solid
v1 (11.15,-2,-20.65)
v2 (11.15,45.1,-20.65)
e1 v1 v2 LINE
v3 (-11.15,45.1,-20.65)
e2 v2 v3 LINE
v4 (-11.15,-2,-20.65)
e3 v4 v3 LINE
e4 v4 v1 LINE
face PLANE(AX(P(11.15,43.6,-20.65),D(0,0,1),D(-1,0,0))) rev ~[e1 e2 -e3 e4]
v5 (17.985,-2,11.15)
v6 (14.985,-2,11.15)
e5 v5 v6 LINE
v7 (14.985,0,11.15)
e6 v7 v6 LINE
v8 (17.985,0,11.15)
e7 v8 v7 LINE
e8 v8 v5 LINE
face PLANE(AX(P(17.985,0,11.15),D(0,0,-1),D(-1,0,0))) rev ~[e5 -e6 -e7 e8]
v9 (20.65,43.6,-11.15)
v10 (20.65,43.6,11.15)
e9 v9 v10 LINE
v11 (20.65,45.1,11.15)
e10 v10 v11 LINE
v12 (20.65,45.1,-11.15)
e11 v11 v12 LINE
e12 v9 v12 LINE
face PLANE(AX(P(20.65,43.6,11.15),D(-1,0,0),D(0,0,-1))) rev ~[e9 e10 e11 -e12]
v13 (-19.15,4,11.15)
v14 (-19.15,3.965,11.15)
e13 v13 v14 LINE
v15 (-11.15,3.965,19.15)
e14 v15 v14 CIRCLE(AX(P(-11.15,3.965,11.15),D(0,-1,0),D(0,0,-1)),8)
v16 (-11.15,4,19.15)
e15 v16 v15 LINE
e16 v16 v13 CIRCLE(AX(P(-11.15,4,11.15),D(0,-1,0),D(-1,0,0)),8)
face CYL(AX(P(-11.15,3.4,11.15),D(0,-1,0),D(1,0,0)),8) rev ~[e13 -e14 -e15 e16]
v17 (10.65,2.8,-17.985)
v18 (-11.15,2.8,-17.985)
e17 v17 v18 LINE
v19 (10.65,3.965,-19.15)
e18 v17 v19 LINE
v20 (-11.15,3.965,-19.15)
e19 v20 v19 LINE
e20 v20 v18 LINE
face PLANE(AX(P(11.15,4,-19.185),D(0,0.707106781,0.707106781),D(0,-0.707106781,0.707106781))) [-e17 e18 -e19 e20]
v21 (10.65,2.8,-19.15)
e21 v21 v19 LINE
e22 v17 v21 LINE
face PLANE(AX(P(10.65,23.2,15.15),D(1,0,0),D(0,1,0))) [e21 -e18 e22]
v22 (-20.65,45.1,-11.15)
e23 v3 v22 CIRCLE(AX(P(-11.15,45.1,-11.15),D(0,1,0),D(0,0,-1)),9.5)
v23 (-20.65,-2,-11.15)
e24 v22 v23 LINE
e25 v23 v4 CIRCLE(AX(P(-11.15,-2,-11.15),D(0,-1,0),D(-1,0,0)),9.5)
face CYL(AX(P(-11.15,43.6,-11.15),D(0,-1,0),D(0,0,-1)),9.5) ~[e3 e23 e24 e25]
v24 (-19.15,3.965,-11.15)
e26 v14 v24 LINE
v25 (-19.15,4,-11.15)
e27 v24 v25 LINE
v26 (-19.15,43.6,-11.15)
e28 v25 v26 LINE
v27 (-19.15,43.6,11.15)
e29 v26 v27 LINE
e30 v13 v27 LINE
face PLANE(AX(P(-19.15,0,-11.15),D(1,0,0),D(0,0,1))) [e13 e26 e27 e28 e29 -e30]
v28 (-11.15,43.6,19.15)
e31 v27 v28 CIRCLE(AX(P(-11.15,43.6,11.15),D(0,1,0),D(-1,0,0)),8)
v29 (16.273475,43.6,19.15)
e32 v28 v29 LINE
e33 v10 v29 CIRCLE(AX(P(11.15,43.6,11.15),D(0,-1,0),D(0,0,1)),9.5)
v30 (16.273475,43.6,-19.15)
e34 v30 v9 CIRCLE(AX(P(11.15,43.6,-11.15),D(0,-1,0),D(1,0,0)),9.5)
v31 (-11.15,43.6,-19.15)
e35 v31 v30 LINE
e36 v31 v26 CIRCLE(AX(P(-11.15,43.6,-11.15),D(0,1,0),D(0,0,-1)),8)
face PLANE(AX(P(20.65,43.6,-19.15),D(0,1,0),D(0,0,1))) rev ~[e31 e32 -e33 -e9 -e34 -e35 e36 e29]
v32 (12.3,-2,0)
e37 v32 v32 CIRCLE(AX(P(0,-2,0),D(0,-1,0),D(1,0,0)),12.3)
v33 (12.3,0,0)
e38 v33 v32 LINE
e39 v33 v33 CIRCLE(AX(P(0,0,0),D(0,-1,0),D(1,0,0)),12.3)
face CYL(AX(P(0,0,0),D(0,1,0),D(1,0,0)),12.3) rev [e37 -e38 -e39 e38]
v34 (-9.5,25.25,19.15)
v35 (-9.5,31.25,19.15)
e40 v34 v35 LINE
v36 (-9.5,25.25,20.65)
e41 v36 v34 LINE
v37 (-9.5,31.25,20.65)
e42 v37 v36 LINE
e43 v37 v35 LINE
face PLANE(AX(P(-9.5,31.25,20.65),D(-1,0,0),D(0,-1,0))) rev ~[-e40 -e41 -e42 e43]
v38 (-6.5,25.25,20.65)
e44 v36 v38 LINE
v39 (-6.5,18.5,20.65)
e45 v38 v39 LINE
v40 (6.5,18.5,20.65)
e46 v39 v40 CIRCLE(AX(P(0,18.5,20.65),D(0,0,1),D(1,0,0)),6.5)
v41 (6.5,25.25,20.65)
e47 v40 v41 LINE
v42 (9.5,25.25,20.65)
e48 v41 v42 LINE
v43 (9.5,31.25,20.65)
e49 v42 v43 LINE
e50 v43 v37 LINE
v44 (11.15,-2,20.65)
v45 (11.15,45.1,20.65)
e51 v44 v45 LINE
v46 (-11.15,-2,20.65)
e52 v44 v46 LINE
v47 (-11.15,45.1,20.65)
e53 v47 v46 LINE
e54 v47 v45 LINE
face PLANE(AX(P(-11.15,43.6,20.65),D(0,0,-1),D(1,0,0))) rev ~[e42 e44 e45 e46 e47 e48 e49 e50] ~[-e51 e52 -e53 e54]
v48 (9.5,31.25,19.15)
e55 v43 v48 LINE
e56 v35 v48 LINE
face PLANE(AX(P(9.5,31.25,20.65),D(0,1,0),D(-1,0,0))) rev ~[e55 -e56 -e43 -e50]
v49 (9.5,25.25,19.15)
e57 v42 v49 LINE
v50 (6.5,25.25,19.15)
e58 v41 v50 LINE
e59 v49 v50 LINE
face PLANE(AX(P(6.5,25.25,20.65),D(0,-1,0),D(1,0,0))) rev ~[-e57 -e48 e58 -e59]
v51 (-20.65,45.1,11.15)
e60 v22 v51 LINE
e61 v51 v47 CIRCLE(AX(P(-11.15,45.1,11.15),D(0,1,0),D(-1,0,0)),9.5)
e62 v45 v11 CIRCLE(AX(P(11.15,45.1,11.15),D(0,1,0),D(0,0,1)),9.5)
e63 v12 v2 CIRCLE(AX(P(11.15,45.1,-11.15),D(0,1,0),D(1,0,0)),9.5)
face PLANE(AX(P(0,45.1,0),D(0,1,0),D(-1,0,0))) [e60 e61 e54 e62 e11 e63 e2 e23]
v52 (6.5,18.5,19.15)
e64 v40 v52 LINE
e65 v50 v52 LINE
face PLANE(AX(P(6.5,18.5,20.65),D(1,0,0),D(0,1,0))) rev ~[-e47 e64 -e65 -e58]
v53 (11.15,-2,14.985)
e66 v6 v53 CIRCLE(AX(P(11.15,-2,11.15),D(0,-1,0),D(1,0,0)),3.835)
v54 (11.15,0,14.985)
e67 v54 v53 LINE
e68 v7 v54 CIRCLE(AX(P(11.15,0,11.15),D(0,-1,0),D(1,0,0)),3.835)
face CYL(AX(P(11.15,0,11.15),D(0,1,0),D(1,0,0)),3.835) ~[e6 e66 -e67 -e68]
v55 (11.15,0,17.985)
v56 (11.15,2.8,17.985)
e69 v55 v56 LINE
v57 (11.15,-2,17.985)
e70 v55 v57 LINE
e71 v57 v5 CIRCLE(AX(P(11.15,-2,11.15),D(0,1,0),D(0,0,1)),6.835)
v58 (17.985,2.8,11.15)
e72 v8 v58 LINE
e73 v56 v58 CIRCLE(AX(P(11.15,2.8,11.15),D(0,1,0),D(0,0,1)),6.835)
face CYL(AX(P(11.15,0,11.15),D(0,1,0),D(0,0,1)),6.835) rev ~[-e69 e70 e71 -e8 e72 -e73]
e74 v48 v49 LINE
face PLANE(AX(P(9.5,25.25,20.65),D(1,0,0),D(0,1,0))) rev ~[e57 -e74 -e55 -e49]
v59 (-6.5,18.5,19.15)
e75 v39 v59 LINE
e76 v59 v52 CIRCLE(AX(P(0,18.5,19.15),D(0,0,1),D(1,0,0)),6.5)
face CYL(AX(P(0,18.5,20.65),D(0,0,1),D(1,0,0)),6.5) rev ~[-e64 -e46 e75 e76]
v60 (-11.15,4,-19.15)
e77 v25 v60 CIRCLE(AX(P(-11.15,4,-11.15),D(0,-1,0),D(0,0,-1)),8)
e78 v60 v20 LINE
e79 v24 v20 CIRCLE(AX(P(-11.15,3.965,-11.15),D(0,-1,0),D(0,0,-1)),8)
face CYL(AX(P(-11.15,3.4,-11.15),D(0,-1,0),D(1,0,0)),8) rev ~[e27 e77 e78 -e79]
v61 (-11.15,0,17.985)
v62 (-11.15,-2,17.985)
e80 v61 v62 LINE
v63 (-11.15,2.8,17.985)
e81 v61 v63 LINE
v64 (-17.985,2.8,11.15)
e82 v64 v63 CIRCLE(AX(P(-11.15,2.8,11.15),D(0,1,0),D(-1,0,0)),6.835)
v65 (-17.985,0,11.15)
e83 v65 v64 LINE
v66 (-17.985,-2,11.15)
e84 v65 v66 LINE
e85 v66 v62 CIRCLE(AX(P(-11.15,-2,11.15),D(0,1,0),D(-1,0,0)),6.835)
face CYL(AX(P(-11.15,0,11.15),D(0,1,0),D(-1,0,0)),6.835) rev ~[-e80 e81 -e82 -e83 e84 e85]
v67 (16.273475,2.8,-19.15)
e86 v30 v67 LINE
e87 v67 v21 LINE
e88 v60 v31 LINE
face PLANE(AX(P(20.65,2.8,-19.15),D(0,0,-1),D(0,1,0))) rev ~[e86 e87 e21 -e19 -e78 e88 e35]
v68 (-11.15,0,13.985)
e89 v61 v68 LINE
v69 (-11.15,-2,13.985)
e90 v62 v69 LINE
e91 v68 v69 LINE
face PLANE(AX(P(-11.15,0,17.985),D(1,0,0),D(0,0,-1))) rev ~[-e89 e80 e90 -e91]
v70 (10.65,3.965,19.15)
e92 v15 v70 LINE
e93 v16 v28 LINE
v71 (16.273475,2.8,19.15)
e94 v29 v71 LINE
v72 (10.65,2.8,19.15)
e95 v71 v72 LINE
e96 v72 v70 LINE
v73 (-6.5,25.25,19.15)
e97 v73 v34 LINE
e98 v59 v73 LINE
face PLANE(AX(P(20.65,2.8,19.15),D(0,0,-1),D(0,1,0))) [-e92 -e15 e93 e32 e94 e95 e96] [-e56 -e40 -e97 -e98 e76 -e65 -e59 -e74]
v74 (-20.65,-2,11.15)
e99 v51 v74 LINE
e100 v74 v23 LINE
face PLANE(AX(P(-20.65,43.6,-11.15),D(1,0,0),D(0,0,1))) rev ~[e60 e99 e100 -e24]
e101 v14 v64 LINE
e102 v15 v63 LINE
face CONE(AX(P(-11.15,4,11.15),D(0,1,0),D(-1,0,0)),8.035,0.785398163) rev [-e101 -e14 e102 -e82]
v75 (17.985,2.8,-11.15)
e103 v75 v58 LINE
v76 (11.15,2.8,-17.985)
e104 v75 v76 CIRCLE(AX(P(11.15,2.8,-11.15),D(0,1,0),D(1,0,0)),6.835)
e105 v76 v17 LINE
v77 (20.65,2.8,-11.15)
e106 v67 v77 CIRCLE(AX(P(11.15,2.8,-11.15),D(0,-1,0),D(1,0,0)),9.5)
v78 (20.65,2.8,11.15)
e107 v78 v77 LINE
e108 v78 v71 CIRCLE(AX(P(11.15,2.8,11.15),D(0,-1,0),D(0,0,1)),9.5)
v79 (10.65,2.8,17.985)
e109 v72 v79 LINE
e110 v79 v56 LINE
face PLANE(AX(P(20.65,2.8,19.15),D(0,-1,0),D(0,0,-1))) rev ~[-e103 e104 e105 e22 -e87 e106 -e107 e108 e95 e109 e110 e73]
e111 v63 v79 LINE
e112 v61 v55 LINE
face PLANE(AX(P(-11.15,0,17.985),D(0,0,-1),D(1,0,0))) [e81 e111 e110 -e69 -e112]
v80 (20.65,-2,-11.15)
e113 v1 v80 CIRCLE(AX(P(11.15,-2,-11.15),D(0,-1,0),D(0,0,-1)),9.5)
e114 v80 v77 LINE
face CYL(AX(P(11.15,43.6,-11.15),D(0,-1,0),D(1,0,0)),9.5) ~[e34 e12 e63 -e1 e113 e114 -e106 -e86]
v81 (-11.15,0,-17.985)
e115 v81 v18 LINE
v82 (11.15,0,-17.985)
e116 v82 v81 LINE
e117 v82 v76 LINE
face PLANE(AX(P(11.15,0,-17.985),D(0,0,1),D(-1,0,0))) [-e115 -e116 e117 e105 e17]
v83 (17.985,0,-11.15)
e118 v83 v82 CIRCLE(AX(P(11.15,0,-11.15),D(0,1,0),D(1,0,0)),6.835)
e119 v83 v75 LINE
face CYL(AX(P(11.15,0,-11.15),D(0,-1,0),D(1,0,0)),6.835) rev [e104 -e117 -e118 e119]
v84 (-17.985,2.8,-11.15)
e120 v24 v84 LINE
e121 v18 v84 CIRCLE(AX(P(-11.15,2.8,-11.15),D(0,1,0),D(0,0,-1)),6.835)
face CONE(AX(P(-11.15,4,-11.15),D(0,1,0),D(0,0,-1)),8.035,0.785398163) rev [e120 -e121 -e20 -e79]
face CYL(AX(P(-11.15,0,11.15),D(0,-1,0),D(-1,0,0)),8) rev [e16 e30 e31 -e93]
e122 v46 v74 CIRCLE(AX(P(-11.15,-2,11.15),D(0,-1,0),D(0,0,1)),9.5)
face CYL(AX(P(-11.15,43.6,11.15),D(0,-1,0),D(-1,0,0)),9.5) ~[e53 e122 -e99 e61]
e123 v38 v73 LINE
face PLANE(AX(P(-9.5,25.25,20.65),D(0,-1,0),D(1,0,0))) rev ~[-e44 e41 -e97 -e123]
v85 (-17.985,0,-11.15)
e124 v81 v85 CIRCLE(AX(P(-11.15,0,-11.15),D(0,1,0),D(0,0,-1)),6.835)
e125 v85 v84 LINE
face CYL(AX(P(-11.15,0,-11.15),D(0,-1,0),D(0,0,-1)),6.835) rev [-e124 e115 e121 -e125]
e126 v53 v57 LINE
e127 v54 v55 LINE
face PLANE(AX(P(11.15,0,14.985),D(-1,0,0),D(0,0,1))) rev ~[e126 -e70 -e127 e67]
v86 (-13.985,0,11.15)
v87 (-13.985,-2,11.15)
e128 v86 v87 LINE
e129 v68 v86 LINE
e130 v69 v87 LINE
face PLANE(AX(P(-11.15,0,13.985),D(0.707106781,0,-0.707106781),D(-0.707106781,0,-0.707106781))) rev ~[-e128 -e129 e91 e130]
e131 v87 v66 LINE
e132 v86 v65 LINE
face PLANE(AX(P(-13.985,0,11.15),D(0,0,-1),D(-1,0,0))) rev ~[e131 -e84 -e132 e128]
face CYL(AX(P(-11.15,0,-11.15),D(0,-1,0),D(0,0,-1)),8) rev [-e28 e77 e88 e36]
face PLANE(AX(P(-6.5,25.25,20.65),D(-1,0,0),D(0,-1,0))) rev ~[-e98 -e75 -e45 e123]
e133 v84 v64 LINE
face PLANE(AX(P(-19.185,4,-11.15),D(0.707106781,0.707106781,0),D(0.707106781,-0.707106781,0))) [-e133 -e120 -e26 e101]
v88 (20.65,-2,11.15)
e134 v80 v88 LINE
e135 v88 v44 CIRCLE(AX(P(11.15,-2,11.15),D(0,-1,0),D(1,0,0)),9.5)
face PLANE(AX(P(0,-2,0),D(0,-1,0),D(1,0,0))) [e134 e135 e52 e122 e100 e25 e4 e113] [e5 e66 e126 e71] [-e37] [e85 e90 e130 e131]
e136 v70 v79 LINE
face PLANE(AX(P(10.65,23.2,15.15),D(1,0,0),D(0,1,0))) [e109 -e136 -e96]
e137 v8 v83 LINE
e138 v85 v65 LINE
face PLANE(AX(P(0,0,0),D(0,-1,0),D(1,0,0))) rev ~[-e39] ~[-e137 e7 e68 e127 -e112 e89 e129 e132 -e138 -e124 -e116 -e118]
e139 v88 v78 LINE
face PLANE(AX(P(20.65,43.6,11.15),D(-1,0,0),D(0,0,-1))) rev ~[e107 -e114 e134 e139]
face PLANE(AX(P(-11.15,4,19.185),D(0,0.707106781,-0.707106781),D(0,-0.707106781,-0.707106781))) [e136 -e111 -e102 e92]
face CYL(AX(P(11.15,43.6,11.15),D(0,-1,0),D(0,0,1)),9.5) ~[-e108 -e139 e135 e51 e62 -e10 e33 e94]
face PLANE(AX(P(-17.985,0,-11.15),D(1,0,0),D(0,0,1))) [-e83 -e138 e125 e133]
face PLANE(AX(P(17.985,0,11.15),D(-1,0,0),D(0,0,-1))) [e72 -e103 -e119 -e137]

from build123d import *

# Parameters (mm, degrees)
F1_DEPTH     = 43.6
F2_DEPTH     = 4
F3_T1_DEPTH  = 22.3
F3_T6_ANGLE  = 90
F3_S7_R      = 8
F3_T8_DEPTH  = 7
F3_T12_DEPTH = 22.3
F3_T17_ANGLE = 90
F3_S18_R     = 8
F3_T19_DEPTH = 7
F3_T23_DEPTH = 22.3
F3_T28_ANGLE = 90
F3_T33_ANGLE = 90
F3_T38_DEPTH = 22.3
F5_DEPTH     = 5
F6_R         = 12.3
F7_DEPTH     = 2
F9_DEPTH     = 1.5
F10_W        = 40.8
F10_H        = 8
F10_H_2      = 22.3
F11_DEPTH    = 10


# Not quite as in the source:
# - a fillet or chamfer that OpenCascade refuses, or shapes differently, is made with other operations: its cross-section is extruded or revolved along the edge and cut away or added


with BuildPart() as f1:
    # F0 (on Front) → F1 (new body)
    with BuildSketch(Plane.XZ):
        with BuildLine():
            ThreePointArc((20.65, 11.15), (17.8675144213, 17.8675144213), (11.15, 20.65))
            Line((11.15, 20.65), (-11.15, 20.65))
            ThreePointArc((-11.15, 20.65), (-17.8675144213, 17.8675144213), (-20.65, 11.15))
            Line((-20.65, 11.15), (-20.65, -11.15))
            ThreePointArc((-20.65, -11.15), (-17.8675144213, -17.8675144213), (-11.15, -20.65))
            Line((-11.15, -20.65), (11.15, -20.65))
            ThreePointArc((11.15, -20.65), (17.8675144213, -17.8675144213), (20.65, -11.15))
            Line((20.65, -11.15), (20.65, 11.15))
        make_face()
        with BuildLine():
            Line((-11.15, 19.15), (11.15, 19.15))
            ThreePointArc((11.15, 19.15), (16.8068542495, 16.8068542495), (19.15, 11.15))
            Line((19.15, 11.15), (19.15, -11.15))
            ThreePointArc((19.15, -11.15), (16.8068542495, -16.8068542495), (11.15, -19.15))
            Line((11.15, -19.15), (-11.15, -19.15))
            ThreePointArc((-11.15, -19.15), (-16.8068542495, -16.8068542495), (-19.15, -11.15))
            Line((-19.15, -11.15), (-19.15, 11.15))
            ThreePointArc((-19.15, 11.15), (-16.8068542495, 16.8068542495), (-11.15, 19.15))
        make_face(mode=Mode.SUBTRACT)
    extrude(amount=-F1_DEPTH)

    # F0 (on Front) → F2 (join)
    with BuildSketch(Plane.XZ):
        with BuildLine():
            ThreePointArc((20.65, 11.15), (17.8675144213, 17.8675144213), (11.15, 20.65))
            Line((11.15, 20.65), (-11.15, 20.65))
            ThreePointArc((-11.15, 20.65), (-17.8675144213, 17.8675144213), (-20.65, 11.15))
            Line((-20.65, 11.15), (-20.65, -11.15))
            ThreePointArc((-20.65, -11.15), (-17.8675144213, -17.8675144213), (-11.15, -20.65))
            Line((-11.15, -20.65), (11.15, -20.65))
            ThreePointArc((11.15, -20.65), (17.8675144213, -17.8675144213), (20.65, -11.15))
            Line((20.65, -11.15), (20.65, 11.15))
        make_face()
        with BuildLine():
            Line((-11.15, 19.15), (11.15, 19.15))
            ThreePointArc((11.15, 19.15), (16.8068542495, 16.8068542495), (19.15, 11.15))
            Line((19.15, 11.15), (19.15, -11.15))
            ThreePointArc((19.15, -11.15), (16.8068542495, -16.8068542495), (11.15, -19.15))
            Line((11.15, -19.15), (-11.15, -19.15))
            ThreePointArc((-11.15, -19.15), (-16.8068542495, -16.8068542495), (-19.15, -11.15))
            Line((-19.15, -11.15), (-19.15, 11.15))
            ThreePointArc((-19.15, 11.15), (-16.8068542495, 16.8068542495), (-11.15, 19.15))
        make_face(mode=Mode.SUBTRACT)
        with BuildLine():
            ThreePointArc((19.15, 11.15), (16.8068542495, 16.8068542495), (11.15, 19.15))
            Line((11.15, 19.15), (-11.15, 19.15))
            ThreePointArc((-11.15, 19.15), (-16.8068542495, 16.8068542495), (-19.15, 11.15))
            Line((-19.15, 11.15), (-19.15, -11.15))
            ThreePointArc((-19.15, -11.15), (-16.8068542495, -16.8068542495), (-11.15, -19.15))
            Line((-11.15, -19.15), (11.15, -19.15))
            ThreePointArc((11.15, -19.15), (16.8068542495, -16.8068542495), (19.15, -11.15))
            Line((19.15, -11.15), (19.15, 11.15))
        make_face()
        with BuildLine():
            Line((-11.15, 17.985), (11.15, 17.985))
            ThreePointArc((11.15, 17.985), (15.9830748494, 15.9830748494), (17.985, 11.15))
            Line((17.985, 11.15), (17.985, -11.15))
            ThreePointArc((17.985, -11.15), (15.9830748494, -15.9830748494), (11.15, -17.985))
            Line((11.15, -17.985), (-11.15, -17.985))
            ThreePointArc((-11.15, -17.985), (-15.9830748494, -15.9830748494), (-17.985, -11.15))
            Line((-17.985, -11.15), (-17.985, 11.15))
            ThreePointArc((-17.985, 11.15), (-15.9830748494, 15.9830748494), (-11.15, 17.985))
        make_face(mode=Mode.SUBTRACT)
    extrude(amount=-F2_DEPTH)

    # F3: chamfer of 1.2 on 8 edges, made by hand

    # F3_s2 → F3_t1 (cut)
    with BuildSketch(Plane.XY.offset(-11.15)):
        Polygon((19.185, 4), (17.985, 2.8), (17.985, 4), align=None)
    extrude(amount=F3_T1_DEPTH, mode=Mode.SUBTRACT)


with BuildPart() as f3_tool4:
    # F3_s5 → F3_t6 (revolve)
    with BuildSketch(Plane.XY.offset(11.15)):
        Polygon((-19.185, 4), (-17.985, 2.8), (-17.985, 4), align=None)
    revolve(axis=Axis((-11.15, 4, 11.15), (0, 1, 0)), revolution_arc=F3_T6_ANGLE)

    # F3_s7 → F3_t8 (intersect, symmetric)
    with BuildSketch(Plane.XZ.offset(-3.4)):
        with Locations((-11.15, 11.15)):
            Circle(F3_S7_R)
    extrude(amount=F3_T8_DEPTH, both=True, mode=Mode.INTERSECT)


with BuildPart() as f1_1:
    add(f1.part)

    # F3_t3: cut F3_tool4
    add(f3_tool4.part, mode=Mode.SUBTRACT)


with BuildPart() as f3_tool10:
    # F3_s11 → F3_t12 (new body)
    with BuildSketch(Plane.XY.offset(-11.15)):
        Polygon((-19.185, 4), (-17.985, 2.8), (-17.985, 4), align=None)
    extrude(amount=F3_T12_DEPTH)

    split(bisect_by=Plane.YZ.offset(-19.15), keep=Keep.TOP)


with BuildPart() as f1_2:
    add(f1_1.part)

    # F3_t9: cut F3_tool10
    add(f3_tool10.part, mode=Mode.SUBTRACT)


with BuildPart() as f3_tool15:
    # F3_s16 → F3_t17 (revolve)
    with BuildSketch(Plane.YZ.offset(-11.15)):
        Polygon((4, -19.185), (2.8, -17.985), (4, -17.985), align=None)
    revolve(axis=Axis((-11.15, 4, -11.15), (0, 1, 0)), revolution_arc=F3_T17_ANGLE)

    # F3_s18 → F3_t19 (intersect, symmetric)
    with BuildSketch(Plane.XZ.offset(-3.4)):
        with Locations((-11.15, -11.15)):
            Circle(F3_S18_R)
    extrude(amount=F3_T19_DEPTH, both=True, mode=Mode.INTERSECT)


with BuildPart() as f1_3:
    add(f1_2.part)

    # F3_t14: cut F3_tool15
    add(f3_tool15.part, mode=Mode.SUBTRACT)


with BuildPart() as f3_tool21:
    # F3_s22 → F3_t23 (new body)
    with BuildSketch(Plane.YZ.offset(11.15)):
        Polygon((4, -19.185), (2.8, -17.985), (4, -17.985), align=None)
    extrude(amount=-F3_T23_DEPTH)

    split(bisect_by=Plane.XY.offset(-19.15), keep=Keep.TOP)


with BuildPart() as f1_4:
    add(f1_3.part)

    # F3_t20: cut F3_tool21
    add(f3_tool21.part, mode=Mode.SUBTRACT)


with BuildPart() as f3_tool26:
    # F3_s27 → F3_t28 (revolve)
    with BuildSketch(Plane.XY.offset(-11.15)):
        Polygon((19.185, 4), (17.985, 2.8), (17.985, 4), align=None)
    revolve(axis=Axis((11.15, 4, -11.15), (0, 1, 0)), revolution_arc=F3_T28_ANGLE)

    split(bisect_by=Plane.XY.offset(-19.15), keep=Keep.TOP)


with BuildPart() as f1_5:
    add(f1_4.part)

    # F3_t25: cut F3_tool26
    add(f3_tool26.part, mode=Mode.SUBTRACT)


with BuildPart() as f3_tool31:
    # F3_s32 → F3_t33 (revolve)
    with BuildSketch(Plane.YZ.offset(11.15)):
        Polygon((4, 19.185), (2.8, 17.985), (4, 17.985), align=None)
    revolve(axis=Axis((11.15, 4, 11.15), (0, 1, 0)), revolution_arc=F3_T33_ANGLE)

    split(bisect_by=Plane.XY.offset(19.15), keep=Keep.BOTTOM)


with BuildPart() as f1_6:
    add(f1_5.part)

    # F3_t30: cut F3_tool31
    add(f3_tool31.part, mode=Mode.SUBTRACT)


with BuildPart() as f3_tool36:
    # F3_s37 → F3_t38 (new body)
    with BuildSketch(Plane.YZ.offset(-11.15)):
        Polygon((4, 19.185), (2.8, 17.985), (4, 17.985), align=None)
    extrude(amount=F3_T38_DEPTH)

    split(bisect_by=Plane.XY.offset(19.15), keep=Keep.BOTTOM)


with BuildPart() as f1_7:
    add(f1_6.part)

    # F3_t35: cut F3_tool36
    add(f3_tool36.part, mode=Mode.SUBTRACT)

    # F4 (on face) → F5 (cut)
    with BuildSketch(Plane.XY.offset(20.65)):
        Polygon((-6.5, 25.25), (6.5, 25.25), (9.5, 25.25), (9.5, 31.25), (-9.5, 31.25), (-9.5, 25.25), align=None)
        with BuildLine():
            ThreePointArc((-6.5, 18.5), (0, 12), (6.5, 18.5))
            ThreePointArc((6.5, 18.5), (0, 25), (-6.5, 18.5))
        make_face()
        with BuildLine():
            ThreePointArc((-6.5, 18.5), (0, 25), (6.5, 18.5))
            Line((6.5, 18.5), (6.5, 25.25))
            Line((6.5, 25.25), (-6.5, 25.25))
            Line((-6.5, 25.25), (-6.5, 18.5))
        make_face()
    extrude(amount=-F5_DEPTH, mode=Mode.SUBTRACT)

    # F6 (on face) → F7 (join)
    with BuildSketch(Plane.XZ):
        with BuildLine():
            Line((20.65, -11.15), (20.65, 11.15))
            ThreePointArc((20.65, 11.15), (17.8675144213, 17.8675144213), (11.15, 20.65))
            Line((11.15, 20.65), (-11.15, 20.65))
            ThreePointArc((-11.15, 20.65), (-17.8675144213, 17.8675144213), (-20.65, 11.15))
            Line((-20.65, 11.15), (-20.65, -11.15))
            ThreePointArc((-20.65, -11.15), (-17.8675144213, -17.8675144213), (-11.15, -20.65))
            Line((-11.15, -20.65), (11.15, -20.65))
            ThreePointArc((11.15, -20.65), (17.8675144213, -17.8675144213), (20.65, -11.15))
        make_face()
        with BuildLine():
            ThreePointArc((11.15, 17.985), (15.9830748494, 15.9830748494), (17.985, 11.15))
            Line((17.985, 11.15), (17.985, -11.15))
            ThreePointArc((17.985, -11.15), (15.9830748494, -15.9830748494), (11.15, -17.985))
            Line((11.15, -17.985), (-11.15, -17.985))
            ThreePointArc((-11.15, -17.985), (-15.9830748494, -15.9830748494), (-17.985, -11.15))
            Line((-17.985, -11.15), (-17.985, 11.15))
            ThreePointArc((-17.985, 11.15), (-15.9830748494, 15.9830748494), (-11.15, 17.985))
            Line((-11.15, 17.985), (11.15, 17.985))
        make_face(mode=Mode.SUBTRACT)
        with BuildLine():
            Line((17.985, 11.15), (14.985, 11.15))
            ThreePointArc((14.985, 11.15), (13.8617545059, 13.8617545059), (11.15, 14.985))
            Line((11.15, 14.985), (11.15, 17.985))
            Line((11.15, 17.985), (-11.15, 17.985))
            Line((-11.15, 17.985), (-11.15, 13.985))
            Line((-11.15, 13.985), (-13.985, 11.15))
            Line((-13.985, 11.15), (-17.985, 11.15))
            Line((-17.985, 11.15), (-17.985, -11.15))
            ThreePointArc((-17.985, -11.15), (-15.9830748494, -15.9830748494), (-11.15, -17.985))
            Line((-11.15, -17.985), (11.15, -17.985))
            ThreePointArc((11.15, -17.985), (15.9830748494, -15.9830748494), (17.985, -11.15))
            Line((17.985, -11.15), (17.985, 11.15))
        make_face()
        Circle(F6_R, mode=Mode.SUBTRACT)
    extrude(amount=F7_DEPTH)

    # F8 (on face) → F9 (join)
    with BuildSketch(Plane(origin=(0, 43.6, 0), x_dir=(-1, 0, 0), z_dir=(0, 1, 0))):
        with BuildLine():
            Line((11.15, 20.65), (-11.15, 20.65))
            ThreePointArc((-11.15, 20.65), (-17.8675144213, 17.8675144213), (-20.65, 11.15))
            Line((-20.65, 11.15), (-20.65, -11.15))
            ThreePointArc((-20.65, -11.15), (-17.8675144213, -17.8675144213), (-11.15, -20.65))
            Line((-11.15, -20.65), (11.15, -20.65))
            ThreePointArc((11.15, -20.65), (17.8675144213, -17.8675144213), (20.65, -11.15))
            Line((20.65, -11.15), (20.65, 11.15))
            ThreePointArc((20.65, 11.15), (17.8675144213, 17.8675144213), (11.15, 20.65))
        make_face()
        with BuildLine():
            ThreePointArc((-19.15, 11.15), (-16.8068542495, 16.8068542495), (-11.15, 19.15))
            Line((-11.15, 19.15), (11.15, 19.15))
            ThreePointArc((11.15, 19.15), (16.8068542495, 16.8068542495), (19.15, 11.15))
            Line((19.15, 11.15), (19.15, -11.15))
            ThreePointArc((19.15, -11.15), (16.8068542495, -16.8068542495), (11.15, -19.15))
            Line((11.15, -19.15), (-11.15, -19.15))
            ThreePointArc((-11.15, -19.15), (-16.8068542495, -16.8068542495), (-19.15, -11.15))
            Line((-19.15, -11.15), (-19.15, 11.15))
        make_face(mode=Mode.SUBTRACT)
        with BuildLine():
            Line((11.15, 19.15), (-11.15, 19.15))
            ThreePointArc((-11.15, 19.15), (-16.8068542495, 16.8068542495), (-19.15, 11.15))
            Line((-19.15, 11.15), (-19.15, -11.15))
            ThreePointArc((-19.15, -11.15), (-16.8068542495, -16.8068542495), (-11.15, -19.15))
            Line((-11.15, -19.15), (11.15, -19.15))
            ThreePointArc((11.15, -19.15), (16.8068542495, -16.8068542495), (19.15, -11.15))
            Line((19.15, -11.15), (19.15, 11.15))
            ThreePointArc((19.15, 11.15), (16.8068542495, 16.8068542495), (11.15, 19.15))
        make_face()
    extrude(amount=F9_DEPTH)

    # F10 (on face) → F11 (cut)
    with BuildSketch(Plane.YZ.offset(20.65)):
        with Locations((23.2, 15.15)):
            Rectangle(F10_W, F10_H)
        with Locations((23.2, 0)):
            Rectangle(F10_W, F10_H_2)
        with Locations((23.2, -15.15)):
            Rectangle(F10_W, F10_H)
    extrude(amount=-F11_DEPTH, mode=Mode.SUBTRACT)


solid = f1_7.part
